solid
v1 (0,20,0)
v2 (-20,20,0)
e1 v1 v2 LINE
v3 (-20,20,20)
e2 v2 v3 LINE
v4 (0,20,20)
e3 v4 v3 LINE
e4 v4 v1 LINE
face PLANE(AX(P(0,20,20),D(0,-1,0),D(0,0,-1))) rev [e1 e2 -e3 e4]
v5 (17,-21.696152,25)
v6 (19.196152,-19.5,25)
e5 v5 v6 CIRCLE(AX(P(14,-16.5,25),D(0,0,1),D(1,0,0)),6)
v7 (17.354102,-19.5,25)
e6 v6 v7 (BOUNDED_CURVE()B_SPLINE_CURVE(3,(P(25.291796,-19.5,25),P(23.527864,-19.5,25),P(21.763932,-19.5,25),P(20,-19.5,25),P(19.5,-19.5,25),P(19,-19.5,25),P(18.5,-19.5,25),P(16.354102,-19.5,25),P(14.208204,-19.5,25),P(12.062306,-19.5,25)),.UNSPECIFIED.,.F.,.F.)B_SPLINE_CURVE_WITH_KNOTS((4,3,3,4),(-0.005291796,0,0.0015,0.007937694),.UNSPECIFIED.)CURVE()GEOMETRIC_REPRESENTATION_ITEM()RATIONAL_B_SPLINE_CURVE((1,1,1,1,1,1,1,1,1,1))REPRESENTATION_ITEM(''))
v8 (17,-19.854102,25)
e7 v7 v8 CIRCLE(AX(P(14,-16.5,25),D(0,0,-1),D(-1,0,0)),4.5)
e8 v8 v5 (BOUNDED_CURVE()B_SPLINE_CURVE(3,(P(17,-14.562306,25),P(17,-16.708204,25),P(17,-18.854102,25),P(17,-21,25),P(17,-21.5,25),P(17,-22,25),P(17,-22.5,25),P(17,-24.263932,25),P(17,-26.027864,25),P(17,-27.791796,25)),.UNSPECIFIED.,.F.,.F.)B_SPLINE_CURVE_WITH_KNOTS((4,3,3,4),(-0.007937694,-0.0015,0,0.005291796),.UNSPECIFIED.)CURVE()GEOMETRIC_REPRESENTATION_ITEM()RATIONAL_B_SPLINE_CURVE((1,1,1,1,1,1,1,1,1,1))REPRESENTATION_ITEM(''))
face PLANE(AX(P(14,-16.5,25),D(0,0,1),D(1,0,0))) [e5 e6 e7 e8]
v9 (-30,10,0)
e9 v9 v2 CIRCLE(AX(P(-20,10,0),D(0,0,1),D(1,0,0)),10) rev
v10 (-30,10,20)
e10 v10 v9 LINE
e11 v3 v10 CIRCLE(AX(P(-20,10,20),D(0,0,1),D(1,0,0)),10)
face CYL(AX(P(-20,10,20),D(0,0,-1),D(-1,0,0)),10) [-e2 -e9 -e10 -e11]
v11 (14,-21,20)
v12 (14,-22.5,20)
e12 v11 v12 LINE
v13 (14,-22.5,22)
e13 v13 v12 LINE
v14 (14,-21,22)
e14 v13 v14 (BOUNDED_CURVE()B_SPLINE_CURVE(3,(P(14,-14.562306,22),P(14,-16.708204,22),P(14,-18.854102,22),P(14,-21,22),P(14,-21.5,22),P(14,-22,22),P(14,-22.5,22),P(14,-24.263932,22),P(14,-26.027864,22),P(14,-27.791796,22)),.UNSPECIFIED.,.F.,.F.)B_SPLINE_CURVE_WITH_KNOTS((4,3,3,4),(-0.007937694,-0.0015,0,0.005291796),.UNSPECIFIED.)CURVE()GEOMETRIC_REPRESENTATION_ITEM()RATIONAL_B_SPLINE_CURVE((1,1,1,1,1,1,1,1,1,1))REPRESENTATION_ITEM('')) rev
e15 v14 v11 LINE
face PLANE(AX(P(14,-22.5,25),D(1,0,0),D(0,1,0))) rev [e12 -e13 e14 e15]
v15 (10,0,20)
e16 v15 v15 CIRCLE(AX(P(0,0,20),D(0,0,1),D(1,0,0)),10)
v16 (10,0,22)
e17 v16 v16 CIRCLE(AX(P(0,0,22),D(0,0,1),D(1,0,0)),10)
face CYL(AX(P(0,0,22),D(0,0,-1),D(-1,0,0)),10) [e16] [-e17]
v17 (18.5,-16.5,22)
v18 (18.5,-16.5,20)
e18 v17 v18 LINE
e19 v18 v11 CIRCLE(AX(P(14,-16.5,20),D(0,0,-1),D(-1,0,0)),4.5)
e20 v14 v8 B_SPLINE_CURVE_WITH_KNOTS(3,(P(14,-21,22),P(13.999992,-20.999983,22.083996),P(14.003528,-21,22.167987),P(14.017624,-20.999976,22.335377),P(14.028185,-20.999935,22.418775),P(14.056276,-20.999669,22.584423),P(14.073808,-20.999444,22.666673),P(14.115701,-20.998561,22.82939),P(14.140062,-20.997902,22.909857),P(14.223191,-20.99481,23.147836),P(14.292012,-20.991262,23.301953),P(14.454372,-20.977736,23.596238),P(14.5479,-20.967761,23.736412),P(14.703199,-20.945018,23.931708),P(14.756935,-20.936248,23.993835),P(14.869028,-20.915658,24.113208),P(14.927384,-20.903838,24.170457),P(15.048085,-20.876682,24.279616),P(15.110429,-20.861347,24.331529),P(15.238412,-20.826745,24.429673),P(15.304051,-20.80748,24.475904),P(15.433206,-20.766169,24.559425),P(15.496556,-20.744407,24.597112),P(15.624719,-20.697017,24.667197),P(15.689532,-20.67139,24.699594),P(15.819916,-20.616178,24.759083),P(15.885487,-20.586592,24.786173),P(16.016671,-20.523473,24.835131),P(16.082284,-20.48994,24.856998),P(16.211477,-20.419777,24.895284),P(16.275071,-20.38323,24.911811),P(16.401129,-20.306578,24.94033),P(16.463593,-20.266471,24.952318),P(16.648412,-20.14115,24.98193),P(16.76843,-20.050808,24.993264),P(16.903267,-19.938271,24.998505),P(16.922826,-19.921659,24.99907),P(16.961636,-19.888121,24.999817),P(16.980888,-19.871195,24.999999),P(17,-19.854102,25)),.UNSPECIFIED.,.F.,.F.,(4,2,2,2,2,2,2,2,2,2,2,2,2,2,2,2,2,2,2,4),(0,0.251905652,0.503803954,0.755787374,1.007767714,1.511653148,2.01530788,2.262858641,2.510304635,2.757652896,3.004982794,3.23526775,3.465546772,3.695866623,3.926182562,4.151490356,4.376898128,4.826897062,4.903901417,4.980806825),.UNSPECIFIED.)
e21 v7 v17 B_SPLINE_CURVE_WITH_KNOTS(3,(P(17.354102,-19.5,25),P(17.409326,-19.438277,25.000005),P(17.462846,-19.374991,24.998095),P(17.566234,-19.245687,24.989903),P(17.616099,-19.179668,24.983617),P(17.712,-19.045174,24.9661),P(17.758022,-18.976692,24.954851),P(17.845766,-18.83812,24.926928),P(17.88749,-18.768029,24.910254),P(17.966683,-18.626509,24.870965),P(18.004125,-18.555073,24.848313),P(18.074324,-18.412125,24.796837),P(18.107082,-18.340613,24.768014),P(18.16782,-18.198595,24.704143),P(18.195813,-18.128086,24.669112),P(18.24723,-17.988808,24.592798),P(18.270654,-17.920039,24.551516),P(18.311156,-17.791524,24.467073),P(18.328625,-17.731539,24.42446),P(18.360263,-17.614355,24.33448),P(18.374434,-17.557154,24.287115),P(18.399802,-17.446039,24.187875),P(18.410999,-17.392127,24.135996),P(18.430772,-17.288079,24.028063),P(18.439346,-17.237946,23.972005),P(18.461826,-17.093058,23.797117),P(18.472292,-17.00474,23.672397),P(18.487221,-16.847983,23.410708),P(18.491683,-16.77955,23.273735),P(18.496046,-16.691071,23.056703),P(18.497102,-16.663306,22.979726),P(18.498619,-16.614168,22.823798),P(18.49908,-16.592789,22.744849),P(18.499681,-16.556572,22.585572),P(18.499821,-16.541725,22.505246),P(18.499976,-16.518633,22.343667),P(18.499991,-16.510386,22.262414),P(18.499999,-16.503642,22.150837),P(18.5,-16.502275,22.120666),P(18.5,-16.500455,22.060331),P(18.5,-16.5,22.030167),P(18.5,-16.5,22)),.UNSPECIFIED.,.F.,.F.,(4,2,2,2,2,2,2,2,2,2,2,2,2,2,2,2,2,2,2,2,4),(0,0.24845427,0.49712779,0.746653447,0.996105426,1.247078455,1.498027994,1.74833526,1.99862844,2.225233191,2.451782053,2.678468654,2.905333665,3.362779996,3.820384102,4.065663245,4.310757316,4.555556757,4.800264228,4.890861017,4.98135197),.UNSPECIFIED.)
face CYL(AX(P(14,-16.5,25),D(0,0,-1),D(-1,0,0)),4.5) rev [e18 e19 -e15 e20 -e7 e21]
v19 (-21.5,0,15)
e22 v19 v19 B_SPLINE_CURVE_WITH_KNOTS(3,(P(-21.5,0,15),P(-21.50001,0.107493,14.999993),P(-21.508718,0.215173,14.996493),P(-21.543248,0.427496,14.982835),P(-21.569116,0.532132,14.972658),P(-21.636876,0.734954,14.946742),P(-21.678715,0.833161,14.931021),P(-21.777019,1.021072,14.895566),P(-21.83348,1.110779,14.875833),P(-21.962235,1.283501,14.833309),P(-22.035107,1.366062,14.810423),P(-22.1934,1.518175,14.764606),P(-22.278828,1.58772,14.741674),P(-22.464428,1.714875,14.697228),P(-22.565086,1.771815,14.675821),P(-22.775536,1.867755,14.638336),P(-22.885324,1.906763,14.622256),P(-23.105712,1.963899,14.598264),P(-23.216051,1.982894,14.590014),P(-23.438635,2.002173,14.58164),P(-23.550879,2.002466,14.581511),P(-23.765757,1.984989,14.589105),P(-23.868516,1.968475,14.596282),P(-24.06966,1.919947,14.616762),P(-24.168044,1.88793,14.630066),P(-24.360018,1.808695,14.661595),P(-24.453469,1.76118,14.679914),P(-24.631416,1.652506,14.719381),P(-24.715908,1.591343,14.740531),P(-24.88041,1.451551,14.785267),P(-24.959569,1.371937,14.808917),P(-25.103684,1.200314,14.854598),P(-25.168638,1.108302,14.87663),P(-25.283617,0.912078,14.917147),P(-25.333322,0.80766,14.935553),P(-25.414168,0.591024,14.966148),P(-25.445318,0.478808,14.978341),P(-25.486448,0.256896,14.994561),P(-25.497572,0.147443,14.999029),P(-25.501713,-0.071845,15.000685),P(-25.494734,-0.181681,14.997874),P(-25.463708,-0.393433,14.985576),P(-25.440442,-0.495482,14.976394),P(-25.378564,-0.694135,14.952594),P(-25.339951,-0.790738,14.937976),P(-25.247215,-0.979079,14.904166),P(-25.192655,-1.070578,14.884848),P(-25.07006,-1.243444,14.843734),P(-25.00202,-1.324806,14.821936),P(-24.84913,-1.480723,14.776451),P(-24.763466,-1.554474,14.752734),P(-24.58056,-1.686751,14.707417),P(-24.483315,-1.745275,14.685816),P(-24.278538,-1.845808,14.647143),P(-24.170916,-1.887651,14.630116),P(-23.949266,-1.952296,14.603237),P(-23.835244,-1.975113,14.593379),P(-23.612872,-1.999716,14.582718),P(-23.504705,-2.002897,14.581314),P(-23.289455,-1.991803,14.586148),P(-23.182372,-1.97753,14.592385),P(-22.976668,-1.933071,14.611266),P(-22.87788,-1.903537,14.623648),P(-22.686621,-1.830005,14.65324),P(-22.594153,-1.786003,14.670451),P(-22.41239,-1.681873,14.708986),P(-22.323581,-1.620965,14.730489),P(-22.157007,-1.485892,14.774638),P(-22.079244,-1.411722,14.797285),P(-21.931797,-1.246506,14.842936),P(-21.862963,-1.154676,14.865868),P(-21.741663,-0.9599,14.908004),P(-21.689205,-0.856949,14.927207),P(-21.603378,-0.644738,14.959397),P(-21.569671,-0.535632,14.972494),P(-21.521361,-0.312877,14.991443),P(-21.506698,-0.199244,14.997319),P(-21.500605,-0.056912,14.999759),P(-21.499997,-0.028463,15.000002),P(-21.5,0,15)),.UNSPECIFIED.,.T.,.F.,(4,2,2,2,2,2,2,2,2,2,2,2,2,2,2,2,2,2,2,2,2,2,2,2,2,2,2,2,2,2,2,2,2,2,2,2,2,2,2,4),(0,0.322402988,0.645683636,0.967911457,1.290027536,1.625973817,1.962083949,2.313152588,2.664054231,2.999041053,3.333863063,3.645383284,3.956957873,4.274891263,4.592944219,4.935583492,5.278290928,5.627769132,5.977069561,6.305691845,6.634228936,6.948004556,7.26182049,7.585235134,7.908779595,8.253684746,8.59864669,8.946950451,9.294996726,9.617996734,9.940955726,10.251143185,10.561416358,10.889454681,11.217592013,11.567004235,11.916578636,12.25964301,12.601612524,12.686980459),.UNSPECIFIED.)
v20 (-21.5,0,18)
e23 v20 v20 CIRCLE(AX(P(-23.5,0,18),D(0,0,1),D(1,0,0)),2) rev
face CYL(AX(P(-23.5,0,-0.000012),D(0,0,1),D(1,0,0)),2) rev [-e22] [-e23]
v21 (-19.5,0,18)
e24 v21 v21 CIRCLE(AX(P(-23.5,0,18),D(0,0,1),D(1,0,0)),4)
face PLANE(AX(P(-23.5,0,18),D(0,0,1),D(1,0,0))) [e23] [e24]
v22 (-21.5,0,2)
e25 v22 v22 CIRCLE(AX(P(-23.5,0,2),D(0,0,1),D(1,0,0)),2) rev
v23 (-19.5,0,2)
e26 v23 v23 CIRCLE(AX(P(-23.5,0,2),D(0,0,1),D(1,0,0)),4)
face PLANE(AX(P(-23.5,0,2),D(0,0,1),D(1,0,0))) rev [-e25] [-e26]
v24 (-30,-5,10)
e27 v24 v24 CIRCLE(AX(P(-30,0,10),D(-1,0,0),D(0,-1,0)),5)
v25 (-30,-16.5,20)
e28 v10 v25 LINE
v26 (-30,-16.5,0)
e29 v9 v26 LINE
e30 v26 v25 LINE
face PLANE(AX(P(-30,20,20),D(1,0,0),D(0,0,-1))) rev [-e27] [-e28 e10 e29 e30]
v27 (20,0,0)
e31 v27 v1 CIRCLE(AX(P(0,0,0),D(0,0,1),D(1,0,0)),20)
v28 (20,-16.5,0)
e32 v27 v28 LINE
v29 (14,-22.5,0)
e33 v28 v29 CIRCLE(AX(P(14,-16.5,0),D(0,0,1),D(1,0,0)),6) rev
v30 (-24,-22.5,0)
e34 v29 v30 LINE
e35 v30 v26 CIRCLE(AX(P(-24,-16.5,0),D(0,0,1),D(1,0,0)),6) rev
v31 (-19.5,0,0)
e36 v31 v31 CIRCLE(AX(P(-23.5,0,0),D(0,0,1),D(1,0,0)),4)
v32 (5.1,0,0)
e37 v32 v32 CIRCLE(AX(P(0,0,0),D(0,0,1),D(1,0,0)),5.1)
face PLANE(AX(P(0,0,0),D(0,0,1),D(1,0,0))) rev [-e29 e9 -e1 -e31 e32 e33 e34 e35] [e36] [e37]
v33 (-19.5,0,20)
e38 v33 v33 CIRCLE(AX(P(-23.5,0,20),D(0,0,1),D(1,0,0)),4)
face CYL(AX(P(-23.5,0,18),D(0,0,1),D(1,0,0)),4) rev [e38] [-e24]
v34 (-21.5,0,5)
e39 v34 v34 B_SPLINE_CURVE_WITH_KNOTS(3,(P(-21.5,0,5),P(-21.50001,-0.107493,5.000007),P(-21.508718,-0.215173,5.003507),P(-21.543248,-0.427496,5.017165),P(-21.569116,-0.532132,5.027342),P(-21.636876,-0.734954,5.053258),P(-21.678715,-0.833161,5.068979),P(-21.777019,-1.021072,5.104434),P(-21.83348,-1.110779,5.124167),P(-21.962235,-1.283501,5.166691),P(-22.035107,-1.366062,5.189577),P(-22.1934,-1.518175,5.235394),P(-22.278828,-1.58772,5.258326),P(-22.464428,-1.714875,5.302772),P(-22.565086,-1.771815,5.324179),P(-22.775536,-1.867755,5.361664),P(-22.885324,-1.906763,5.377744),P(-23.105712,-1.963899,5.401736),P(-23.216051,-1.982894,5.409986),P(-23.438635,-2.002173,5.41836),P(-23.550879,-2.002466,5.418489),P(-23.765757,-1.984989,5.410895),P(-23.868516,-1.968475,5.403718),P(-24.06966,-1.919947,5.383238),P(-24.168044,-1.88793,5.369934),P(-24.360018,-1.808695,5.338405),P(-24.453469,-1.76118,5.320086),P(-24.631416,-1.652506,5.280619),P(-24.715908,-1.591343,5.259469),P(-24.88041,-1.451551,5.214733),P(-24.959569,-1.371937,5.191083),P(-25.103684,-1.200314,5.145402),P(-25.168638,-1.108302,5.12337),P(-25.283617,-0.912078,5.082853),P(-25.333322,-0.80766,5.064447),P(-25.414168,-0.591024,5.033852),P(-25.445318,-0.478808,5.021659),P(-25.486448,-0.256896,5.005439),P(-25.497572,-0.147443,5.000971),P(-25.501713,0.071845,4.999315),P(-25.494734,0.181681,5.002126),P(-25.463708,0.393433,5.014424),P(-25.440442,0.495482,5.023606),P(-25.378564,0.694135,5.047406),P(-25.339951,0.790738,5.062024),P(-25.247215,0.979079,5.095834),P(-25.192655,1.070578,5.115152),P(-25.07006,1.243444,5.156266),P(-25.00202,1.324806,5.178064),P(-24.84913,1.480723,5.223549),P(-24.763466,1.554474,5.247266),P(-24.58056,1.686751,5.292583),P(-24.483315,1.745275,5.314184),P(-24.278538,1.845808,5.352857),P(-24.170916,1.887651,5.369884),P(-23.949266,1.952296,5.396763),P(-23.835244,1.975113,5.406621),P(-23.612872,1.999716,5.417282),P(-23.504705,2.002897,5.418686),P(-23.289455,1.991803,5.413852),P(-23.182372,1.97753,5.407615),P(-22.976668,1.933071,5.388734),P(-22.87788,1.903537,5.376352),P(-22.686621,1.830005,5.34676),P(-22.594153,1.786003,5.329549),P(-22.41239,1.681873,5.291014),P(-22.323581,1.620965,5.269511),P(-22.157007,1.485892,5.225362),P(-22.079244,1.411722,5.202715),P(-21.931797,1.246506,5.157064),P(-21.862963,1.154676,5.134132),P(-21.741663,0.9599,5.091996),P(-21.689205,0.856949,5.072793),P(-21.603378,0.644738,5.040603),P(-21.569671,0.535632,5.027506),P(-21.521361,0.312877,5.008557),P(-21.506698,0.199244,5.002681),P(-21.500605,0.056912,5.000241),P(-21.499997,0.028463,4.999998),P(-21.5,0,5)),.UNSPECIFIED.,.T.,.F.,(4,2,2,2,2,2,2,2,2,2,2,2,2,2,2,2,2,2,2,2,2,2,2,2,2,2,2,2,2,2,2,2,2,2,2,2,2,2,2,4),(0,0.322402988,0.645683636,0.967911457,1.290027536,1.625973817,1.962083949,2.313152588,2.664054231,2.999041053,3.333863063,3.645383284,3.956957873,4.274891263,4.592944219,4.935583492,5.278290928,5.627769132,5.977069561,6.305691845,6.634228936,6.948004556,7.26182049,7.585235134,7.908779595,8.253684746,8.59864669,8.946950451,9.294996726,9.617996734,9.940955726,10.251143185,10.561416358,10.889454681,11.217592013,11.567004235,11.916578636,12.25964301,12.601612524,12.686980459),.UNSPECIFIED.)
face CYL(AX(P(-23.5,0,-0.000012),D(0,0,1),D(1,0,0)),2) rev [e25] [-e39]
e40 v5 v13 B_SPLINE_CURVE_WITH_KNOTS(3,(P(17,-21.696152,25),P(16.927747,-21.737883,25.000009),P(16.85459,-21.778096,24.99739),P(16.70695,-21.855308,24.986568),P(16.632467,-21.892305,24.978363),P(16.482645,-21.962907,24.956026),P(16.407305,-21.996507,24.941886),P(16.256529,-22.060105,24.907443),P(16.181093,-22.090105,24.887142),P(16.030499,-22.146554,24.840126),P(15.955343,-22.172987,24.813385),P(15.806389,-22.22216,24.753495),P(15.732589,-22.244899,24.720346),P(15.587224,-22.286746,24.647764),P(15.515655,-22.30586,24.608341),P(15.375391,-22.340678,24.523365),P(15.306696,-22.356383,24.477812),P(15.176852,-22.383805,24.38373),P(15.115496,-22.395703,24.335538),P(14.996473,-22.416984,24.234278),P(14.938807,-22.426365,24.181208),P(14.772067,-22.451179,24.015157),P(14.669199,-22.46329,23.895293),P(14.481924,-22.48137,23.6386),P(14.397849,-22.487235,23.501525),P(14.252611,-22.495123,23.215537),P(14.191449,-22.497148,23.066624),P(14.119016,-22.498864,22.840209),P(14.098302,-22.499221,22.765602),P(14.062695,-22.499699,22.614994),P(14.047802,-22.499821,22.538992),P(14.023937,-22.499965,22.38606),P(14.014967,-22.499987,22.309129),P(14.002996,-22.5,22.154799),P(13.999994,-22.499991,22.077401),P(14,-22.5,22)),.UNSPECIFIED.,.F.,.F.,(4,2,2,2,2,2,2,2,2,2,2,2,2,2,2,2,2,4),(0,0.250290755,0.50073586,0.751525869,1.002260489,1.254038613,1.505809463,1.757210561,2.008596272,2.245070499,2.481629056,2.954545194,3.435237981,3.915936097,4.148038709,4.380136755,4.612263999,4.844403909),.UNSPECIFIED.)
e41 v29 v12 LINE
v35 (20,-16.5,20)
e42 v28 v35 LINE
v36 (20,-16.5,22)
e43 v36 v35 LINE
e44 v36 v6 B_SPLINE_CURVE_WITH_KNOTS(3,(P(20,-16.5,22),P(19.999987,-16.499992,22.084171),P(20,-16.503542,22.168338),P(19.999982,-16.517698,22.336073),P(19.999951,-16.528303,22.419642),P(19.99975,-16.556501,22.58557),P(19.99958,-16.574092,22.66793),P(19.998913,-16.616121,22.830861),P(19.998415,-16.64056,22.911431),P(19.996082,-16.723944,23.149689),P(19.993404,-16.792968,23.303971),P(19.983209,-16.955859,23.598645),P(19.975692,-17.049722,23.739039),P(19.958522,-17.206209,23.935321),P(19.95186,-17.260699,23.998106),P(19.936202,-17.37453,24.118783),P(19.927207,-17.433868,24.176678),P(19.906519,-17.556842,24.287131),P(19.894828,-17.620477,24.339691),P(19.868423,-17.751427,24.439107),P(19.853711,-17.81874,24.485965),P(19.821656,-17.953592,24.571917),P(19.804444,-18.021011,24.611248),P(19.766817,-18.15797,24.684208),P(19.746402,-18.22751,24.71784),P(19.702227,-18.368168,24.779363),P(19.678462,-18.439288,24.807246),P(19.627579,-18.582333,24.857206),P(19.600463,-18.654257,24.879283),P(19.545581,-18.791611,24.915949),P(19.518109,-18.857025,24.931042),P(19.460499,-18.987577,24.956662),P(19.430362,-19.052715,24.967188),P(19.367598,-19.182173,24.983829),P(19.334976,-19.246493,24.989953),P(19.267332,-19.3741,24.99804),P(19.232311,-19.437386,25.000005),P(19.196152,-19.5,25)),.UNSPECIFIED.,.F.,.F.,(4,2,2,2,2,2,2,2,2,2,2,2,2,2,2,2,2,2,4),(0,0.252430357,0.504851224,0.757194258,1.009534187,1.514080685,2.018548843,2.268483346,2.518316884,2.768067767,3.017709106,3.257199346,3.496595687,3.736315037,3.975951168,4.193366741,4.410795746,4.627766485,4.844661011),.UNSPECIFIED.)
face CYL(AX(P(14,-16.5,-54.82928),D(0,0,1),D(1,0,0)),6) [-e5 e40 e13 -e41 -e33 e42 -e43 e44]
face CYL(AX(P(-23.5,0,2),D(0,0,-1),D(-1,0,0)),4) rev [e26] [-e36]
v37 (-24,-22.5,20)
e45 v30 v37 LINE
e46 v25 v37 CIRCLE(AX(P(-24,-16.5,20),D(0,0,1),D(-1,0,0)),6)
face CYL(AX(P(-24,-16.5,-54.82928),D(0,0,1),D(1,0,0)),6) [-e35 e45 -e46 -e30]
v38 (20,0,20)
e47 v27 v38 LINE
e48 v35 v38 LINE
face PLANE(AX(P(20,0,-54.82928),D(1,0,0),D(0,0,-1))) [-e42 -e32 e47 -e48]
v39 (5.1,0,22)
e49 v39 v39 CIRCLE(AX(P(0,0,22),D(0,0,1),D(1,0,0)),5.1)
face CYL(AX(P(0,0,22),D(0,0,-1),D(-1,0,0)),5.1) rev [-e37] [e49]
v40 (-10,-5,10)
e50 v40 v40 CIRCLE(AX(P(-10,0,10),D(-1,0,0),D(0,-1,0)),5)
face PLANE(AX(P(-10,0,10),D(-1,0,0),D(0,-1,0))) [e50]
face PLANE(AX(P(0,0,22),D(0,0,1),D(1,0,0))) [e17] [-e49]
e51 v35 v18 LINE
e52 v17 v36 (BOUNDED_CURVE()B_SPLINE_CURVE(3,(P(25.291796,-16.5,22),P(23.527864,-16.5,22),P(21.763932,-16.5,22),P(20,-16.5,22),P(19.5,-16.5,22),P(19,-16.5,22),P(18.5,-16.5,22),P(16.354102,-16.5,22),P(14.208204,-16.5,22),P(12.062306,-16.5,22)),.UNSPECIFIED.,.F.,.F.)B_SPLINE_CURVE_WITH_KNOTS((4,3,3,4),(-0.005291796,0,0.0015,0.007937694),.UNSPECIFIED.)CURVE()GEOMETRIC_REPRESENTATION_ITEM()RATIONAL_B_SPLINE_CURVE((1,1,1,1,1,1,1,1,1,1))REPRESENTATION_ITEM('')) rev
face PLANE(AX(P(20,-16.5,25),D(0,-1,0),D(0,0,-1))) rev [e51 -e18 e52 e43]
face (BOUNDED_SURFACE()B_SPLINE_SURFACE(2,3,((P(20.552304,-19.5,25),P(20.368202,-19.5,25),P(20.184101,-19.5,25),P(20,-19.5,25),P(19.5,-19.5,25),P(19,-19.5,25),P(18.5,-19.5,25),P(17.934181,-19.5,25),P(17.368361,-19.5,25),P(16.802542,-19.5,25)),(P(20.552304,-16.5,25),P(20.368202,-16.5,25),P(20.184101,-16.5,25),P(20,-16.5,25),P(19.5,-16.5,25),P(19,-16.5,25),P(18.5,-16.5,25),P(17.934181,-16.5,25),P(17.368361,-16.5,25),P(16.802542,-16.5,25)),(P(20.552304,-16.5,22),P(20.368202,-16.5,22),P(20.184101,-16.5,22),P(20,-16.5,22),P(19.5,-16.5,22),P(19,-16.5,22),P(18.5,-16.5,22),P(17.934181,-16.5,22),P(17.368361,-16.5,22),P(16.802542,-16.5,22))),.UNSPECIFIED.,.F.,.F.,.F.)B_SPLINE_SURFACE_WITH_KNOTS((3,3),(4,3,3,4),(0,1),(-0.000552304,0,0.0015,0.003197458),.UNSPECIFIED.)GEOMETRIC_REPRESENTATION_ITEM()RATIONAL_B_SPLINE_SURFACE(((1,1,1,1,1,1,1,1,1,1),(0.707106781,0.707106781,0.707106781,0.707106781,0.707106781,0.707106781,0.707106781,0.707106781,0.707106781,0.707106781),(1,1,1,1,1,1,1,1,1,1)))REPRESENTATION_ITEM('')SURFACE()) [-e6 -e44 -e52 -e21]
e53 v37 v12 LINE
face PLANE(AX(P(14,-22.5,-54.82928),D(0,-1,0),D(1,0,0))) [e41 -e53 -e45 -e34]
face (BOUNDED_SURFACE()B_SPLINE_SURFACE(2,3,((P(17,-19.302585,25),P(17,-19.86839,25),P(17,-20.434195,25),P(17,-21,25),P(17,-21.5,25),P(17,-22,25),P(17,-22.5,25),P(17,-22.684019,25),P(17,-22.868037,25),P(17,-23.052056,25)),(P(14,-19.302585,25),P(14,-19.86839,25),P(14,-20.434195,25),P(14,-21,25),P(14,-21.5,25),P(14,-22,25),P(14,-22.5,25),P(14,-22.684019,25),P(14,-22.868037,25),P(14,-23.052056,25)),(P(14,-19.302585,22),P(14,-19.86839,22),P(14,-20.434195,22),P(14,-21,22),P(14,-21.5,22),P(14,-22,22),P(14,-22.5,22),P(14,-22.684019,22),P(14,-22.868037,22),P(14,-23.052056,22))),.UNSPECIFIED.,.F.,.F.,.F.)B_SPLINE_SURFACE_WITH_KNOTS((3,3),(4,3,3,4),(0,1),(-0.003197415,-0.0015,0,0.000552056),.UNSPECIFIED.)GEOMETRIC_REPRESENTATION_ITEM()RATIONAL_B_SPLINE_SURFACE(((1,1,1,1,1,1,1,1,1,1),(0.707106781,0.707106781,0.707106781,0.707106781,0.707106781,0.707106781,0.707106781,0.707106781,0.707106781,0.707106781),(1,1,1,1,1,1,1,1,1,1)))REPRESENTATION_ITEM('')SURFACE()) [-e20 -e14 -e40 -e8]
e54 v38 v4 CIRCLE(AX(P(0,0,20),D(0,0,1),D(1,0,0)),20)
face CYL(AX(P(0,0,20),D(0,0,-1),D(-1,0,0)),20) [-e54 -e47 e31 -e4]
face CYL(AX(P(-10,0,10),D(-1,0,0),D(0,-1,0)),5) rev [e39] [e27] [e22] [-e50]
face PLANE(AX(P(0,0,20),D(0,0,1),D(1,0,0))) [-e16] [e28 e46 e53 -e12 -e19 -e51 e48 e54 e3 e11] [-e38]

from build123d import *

# Parameters (mm, degrees)
BOSS_EXTRU_1_DEPTH           = 20
ESQUISSE3_R                  = 5
ENL_V_MAT_EXTRU_1_DEPTH      = 20
CONG_1_R                     = 10
ENL_V_MAT_EXTRU_3_DEPTH      = 42.231056256
ENL_V_MAT_EXTRU_3_DEPTH_BACK = 42.231056256
ESQUISSE1_4_R                = 2
ESQUISSE1_5_R                = 4
ENL_V_MAT_EXTRU_4_DEPTH      = 2
ENL_V_START                  = 18
ESQUISSE1_6_R                = 4
ENL_V_MAT_EXTRU_5_DEPTH      = 2
BOSS_EXTRU_4_DEPTH           = 20
BOSS_EXTRU_5_START           = 5
BOSS_EXTRU_5_DEPTH           = 5
CONG_3_START                 = -24
CONG_3_DEPTH                 = 7.5
CONG_4_START                 = 16.9999999
CONG_4_DEPTH                 = 4.0000001
ENL_V_MAT_EXTRU_6_DEPTH      = 2
ENL_V_MAT_EXTRU_6_DEPTH_BACK = 43.500000171
ESQUISSE7_R                  = 5.1
BOSS_EXTRU_7_START           = 2
ESQUISSE9_R                  = 10
ESQUISSE9_R_2                = 5.1
BOSS_EXTRU_7_DEPTH           = 2


with BuildPart() as part:
    # Esquisse1 → Boss.-Extru.1 (new body)
    with BuildSketch(Plane.XY):
        with BuildLine():
            Line((0, 20), (-30, 20))
            Line((-30, 20), (-30, -20))
            Line((-30, -20), (0, -20))
            ThreePointArc((0, -20), (20, 0), (0, 20))
        make_face()
    extrude(amount=BOSS_EXTRU_1_DEPTH)

    # Esquisse3 → Enlèv. mat.-Extru.1 (cut)
    with BuildSketch(Plane.ZY.offset(30)):
        with Locations(Location((10, 0, 0), (0, 0, 270))):
            Circle(ESQUISSE3_R)
    extrude(amount=-ENL_V_MAT_EXTRU_1_DEPTH, mode=Mode.SUBTRACT)

    # Congé1
    cong_1_edges = [part.edges().sort_by_distance(p)[0] for p in [
        (-30, 20, 10),
        (-30, -20, 10),
    ]]
    fillet(cong_1_edges, radius=CONG_1_R)

    # Esquisse1<4> → Enlèv. mat.-Extru.3 (cut, two sides: drawn at the far end of the back side and taken through both)
    with BuildSketch(Plane.XY.offset(-ENL_V_MAT_EXTRU_3_DEPTH_BACK)):
        with Locations((-23.5, 0)):
            Circle(ESQUISSE1_4_R)
    extrude(amount=ENL_V_MAT_EXTRU_3_DEPTH + ENL_V_MAT_EXTRU_3_DEPTH_BACK, mode=Mode.SUBTRACT)

    # Esquisse1<5> → Enlèv. mat.-Extru.4 (cut)
    with BuildSketch(Plane.XY):
        with Locations((-23.5, 0)):
            Circle(ESQUISSE1_5_R)
    extrude(amount=ENL_V_MAT_EXTRU_4_DEPTH, mode=Mode.SUBTRACT)

    # Esquisse1<6> → Enlèv. mat.-Extru.5 (cut)
    with BuildSketch(Plane.XY.offset(ENL_V_START)):
        with Locations((-23.5, 0)):
            Circle(ESQUISSE1_6_R)
    extrude(amount=ENL_V_MAT_EXTRU_5_DEPTH, mode=Mode.SUBTRACT)

    # Esquisse5 → Boss.-Extru.4 (add)
    with BuildSketch(Plane.XY.offset(20)):
        with BuildLine():
            Line((20, 0), (20, -16.5))
            ThreePointArc((20, -16.5), (18.242640687, -20.742640687), (14, -22.5))
            Line((14, -22.5), (-24, -22.5))
            ThreePointArc((-24, -22.5), (-28.242640687, -20.742640687), (-30, -16.5))
            Line((-30, -16.5), (-30, -10))
            ThreePointArc((-30, -10), (-27.071067812, -17.071067812), (-20, -20))
            Line((-20, -20), (0, -20))
            ThreePointArc((0, -20), (14.142135624, -14.142135624), (20, 0))
        make_face()
    extrude(amount=-BOSS_EXTRU_4_DEPTH)

    # Esquisse6 → Boss.-Extru.5 (add)
    with BuildSketch(Plane.XY.offset(20).offset(BOSS_EXTRU_5_START)):
        with BuildLine():
            Line((20, -16.5), (18.5, -16.5))
            ThreePointArc((18.5, -16.5), (17.181980515, -19.681980515), (14, -21))
            Line((14, -21), (14, -22.5))
            ThreePointArc((14, -22.5), (18.242640687, -20.742640687), (20, -16.5))
        make_face()
    extrude(amount=-BOSS_EXTRU_5_DEPTH)

    # Congé3: read off the stored shape, not the designer's step
    # Congé3 outline → Congé3 (cut)
    with BuildSketch(Plane(origin=(0, 0, 0), x_dir=(1, 0, 0), z_dir=(0, 1, 0)).offset(CONG_3_START)):
        with BuildLine():
            Line((14, -25), (17, -25))
            add(Edge.make_bspline(
                [(17, -25), (14, -25), (14, -22)],
                knots=[0, 0, 0, 1, 1, 1], degree=2, weights=[1, 0.707106781, 1]))
            Line((14, -22), (14, -25))
        make_face()
    extrude(amount=CONG_3_DEPTH, mode=Mode.SUBTRACT)

    # Congé4: read off the stored shape, not the designer's step
    # Congé4 outline → Congé4 (cut)
    with BuildSketch(Plane.YZ.offset(CONG_4_START)):
        with BuildLine():
            Line((-16.5, 25), (-19.5, 25))
            add(Edge.make_bspline(
                [(-19.5, 25), (-16.5, 25), (-16.5, 22)],
                knots=[0, 0, 0, 1, 1, 1], degree=2, weights=[1, 0.707106781, 1]))
            Line((-16.5, 22), (-16.5, 25))
        make_face()
    extrude(amount=CONG_4_DEPTH, mode=Mode.SUBTRACT)

    # Esquisse7 → Enlèv. mat.-Extru.6 (cut, two sides: drawn at the far end of the back side and taken through both)
    with BuildSketch(Plane.XY.offset(20).offset(-ENL_V_MAT_EXTRU_6_DEPTH_BACK)):
        Circle(ESQUISSE7_R)
    extrude(amount=ENL_V_MAT_EXTRU_6_DEPTH + ENL_V_MAT_EXTRU_6_DEPTH_BACK, mode=Mode.SUBTRACT)

    # Esquisse9 → Boss.-Extru.7 (add)
    with BuildSketch(Plane.XY.offset(20).offset(BOSS_EXTRU_7_START)):
        Circle(ESQUISSE9_R)
        Circle(ESQUISSE9_R_2, mode=Mode.SUBTRACT)
    extrude(amount=-BOSS_EXTRU_7_DEPTH)


solid = part.part
